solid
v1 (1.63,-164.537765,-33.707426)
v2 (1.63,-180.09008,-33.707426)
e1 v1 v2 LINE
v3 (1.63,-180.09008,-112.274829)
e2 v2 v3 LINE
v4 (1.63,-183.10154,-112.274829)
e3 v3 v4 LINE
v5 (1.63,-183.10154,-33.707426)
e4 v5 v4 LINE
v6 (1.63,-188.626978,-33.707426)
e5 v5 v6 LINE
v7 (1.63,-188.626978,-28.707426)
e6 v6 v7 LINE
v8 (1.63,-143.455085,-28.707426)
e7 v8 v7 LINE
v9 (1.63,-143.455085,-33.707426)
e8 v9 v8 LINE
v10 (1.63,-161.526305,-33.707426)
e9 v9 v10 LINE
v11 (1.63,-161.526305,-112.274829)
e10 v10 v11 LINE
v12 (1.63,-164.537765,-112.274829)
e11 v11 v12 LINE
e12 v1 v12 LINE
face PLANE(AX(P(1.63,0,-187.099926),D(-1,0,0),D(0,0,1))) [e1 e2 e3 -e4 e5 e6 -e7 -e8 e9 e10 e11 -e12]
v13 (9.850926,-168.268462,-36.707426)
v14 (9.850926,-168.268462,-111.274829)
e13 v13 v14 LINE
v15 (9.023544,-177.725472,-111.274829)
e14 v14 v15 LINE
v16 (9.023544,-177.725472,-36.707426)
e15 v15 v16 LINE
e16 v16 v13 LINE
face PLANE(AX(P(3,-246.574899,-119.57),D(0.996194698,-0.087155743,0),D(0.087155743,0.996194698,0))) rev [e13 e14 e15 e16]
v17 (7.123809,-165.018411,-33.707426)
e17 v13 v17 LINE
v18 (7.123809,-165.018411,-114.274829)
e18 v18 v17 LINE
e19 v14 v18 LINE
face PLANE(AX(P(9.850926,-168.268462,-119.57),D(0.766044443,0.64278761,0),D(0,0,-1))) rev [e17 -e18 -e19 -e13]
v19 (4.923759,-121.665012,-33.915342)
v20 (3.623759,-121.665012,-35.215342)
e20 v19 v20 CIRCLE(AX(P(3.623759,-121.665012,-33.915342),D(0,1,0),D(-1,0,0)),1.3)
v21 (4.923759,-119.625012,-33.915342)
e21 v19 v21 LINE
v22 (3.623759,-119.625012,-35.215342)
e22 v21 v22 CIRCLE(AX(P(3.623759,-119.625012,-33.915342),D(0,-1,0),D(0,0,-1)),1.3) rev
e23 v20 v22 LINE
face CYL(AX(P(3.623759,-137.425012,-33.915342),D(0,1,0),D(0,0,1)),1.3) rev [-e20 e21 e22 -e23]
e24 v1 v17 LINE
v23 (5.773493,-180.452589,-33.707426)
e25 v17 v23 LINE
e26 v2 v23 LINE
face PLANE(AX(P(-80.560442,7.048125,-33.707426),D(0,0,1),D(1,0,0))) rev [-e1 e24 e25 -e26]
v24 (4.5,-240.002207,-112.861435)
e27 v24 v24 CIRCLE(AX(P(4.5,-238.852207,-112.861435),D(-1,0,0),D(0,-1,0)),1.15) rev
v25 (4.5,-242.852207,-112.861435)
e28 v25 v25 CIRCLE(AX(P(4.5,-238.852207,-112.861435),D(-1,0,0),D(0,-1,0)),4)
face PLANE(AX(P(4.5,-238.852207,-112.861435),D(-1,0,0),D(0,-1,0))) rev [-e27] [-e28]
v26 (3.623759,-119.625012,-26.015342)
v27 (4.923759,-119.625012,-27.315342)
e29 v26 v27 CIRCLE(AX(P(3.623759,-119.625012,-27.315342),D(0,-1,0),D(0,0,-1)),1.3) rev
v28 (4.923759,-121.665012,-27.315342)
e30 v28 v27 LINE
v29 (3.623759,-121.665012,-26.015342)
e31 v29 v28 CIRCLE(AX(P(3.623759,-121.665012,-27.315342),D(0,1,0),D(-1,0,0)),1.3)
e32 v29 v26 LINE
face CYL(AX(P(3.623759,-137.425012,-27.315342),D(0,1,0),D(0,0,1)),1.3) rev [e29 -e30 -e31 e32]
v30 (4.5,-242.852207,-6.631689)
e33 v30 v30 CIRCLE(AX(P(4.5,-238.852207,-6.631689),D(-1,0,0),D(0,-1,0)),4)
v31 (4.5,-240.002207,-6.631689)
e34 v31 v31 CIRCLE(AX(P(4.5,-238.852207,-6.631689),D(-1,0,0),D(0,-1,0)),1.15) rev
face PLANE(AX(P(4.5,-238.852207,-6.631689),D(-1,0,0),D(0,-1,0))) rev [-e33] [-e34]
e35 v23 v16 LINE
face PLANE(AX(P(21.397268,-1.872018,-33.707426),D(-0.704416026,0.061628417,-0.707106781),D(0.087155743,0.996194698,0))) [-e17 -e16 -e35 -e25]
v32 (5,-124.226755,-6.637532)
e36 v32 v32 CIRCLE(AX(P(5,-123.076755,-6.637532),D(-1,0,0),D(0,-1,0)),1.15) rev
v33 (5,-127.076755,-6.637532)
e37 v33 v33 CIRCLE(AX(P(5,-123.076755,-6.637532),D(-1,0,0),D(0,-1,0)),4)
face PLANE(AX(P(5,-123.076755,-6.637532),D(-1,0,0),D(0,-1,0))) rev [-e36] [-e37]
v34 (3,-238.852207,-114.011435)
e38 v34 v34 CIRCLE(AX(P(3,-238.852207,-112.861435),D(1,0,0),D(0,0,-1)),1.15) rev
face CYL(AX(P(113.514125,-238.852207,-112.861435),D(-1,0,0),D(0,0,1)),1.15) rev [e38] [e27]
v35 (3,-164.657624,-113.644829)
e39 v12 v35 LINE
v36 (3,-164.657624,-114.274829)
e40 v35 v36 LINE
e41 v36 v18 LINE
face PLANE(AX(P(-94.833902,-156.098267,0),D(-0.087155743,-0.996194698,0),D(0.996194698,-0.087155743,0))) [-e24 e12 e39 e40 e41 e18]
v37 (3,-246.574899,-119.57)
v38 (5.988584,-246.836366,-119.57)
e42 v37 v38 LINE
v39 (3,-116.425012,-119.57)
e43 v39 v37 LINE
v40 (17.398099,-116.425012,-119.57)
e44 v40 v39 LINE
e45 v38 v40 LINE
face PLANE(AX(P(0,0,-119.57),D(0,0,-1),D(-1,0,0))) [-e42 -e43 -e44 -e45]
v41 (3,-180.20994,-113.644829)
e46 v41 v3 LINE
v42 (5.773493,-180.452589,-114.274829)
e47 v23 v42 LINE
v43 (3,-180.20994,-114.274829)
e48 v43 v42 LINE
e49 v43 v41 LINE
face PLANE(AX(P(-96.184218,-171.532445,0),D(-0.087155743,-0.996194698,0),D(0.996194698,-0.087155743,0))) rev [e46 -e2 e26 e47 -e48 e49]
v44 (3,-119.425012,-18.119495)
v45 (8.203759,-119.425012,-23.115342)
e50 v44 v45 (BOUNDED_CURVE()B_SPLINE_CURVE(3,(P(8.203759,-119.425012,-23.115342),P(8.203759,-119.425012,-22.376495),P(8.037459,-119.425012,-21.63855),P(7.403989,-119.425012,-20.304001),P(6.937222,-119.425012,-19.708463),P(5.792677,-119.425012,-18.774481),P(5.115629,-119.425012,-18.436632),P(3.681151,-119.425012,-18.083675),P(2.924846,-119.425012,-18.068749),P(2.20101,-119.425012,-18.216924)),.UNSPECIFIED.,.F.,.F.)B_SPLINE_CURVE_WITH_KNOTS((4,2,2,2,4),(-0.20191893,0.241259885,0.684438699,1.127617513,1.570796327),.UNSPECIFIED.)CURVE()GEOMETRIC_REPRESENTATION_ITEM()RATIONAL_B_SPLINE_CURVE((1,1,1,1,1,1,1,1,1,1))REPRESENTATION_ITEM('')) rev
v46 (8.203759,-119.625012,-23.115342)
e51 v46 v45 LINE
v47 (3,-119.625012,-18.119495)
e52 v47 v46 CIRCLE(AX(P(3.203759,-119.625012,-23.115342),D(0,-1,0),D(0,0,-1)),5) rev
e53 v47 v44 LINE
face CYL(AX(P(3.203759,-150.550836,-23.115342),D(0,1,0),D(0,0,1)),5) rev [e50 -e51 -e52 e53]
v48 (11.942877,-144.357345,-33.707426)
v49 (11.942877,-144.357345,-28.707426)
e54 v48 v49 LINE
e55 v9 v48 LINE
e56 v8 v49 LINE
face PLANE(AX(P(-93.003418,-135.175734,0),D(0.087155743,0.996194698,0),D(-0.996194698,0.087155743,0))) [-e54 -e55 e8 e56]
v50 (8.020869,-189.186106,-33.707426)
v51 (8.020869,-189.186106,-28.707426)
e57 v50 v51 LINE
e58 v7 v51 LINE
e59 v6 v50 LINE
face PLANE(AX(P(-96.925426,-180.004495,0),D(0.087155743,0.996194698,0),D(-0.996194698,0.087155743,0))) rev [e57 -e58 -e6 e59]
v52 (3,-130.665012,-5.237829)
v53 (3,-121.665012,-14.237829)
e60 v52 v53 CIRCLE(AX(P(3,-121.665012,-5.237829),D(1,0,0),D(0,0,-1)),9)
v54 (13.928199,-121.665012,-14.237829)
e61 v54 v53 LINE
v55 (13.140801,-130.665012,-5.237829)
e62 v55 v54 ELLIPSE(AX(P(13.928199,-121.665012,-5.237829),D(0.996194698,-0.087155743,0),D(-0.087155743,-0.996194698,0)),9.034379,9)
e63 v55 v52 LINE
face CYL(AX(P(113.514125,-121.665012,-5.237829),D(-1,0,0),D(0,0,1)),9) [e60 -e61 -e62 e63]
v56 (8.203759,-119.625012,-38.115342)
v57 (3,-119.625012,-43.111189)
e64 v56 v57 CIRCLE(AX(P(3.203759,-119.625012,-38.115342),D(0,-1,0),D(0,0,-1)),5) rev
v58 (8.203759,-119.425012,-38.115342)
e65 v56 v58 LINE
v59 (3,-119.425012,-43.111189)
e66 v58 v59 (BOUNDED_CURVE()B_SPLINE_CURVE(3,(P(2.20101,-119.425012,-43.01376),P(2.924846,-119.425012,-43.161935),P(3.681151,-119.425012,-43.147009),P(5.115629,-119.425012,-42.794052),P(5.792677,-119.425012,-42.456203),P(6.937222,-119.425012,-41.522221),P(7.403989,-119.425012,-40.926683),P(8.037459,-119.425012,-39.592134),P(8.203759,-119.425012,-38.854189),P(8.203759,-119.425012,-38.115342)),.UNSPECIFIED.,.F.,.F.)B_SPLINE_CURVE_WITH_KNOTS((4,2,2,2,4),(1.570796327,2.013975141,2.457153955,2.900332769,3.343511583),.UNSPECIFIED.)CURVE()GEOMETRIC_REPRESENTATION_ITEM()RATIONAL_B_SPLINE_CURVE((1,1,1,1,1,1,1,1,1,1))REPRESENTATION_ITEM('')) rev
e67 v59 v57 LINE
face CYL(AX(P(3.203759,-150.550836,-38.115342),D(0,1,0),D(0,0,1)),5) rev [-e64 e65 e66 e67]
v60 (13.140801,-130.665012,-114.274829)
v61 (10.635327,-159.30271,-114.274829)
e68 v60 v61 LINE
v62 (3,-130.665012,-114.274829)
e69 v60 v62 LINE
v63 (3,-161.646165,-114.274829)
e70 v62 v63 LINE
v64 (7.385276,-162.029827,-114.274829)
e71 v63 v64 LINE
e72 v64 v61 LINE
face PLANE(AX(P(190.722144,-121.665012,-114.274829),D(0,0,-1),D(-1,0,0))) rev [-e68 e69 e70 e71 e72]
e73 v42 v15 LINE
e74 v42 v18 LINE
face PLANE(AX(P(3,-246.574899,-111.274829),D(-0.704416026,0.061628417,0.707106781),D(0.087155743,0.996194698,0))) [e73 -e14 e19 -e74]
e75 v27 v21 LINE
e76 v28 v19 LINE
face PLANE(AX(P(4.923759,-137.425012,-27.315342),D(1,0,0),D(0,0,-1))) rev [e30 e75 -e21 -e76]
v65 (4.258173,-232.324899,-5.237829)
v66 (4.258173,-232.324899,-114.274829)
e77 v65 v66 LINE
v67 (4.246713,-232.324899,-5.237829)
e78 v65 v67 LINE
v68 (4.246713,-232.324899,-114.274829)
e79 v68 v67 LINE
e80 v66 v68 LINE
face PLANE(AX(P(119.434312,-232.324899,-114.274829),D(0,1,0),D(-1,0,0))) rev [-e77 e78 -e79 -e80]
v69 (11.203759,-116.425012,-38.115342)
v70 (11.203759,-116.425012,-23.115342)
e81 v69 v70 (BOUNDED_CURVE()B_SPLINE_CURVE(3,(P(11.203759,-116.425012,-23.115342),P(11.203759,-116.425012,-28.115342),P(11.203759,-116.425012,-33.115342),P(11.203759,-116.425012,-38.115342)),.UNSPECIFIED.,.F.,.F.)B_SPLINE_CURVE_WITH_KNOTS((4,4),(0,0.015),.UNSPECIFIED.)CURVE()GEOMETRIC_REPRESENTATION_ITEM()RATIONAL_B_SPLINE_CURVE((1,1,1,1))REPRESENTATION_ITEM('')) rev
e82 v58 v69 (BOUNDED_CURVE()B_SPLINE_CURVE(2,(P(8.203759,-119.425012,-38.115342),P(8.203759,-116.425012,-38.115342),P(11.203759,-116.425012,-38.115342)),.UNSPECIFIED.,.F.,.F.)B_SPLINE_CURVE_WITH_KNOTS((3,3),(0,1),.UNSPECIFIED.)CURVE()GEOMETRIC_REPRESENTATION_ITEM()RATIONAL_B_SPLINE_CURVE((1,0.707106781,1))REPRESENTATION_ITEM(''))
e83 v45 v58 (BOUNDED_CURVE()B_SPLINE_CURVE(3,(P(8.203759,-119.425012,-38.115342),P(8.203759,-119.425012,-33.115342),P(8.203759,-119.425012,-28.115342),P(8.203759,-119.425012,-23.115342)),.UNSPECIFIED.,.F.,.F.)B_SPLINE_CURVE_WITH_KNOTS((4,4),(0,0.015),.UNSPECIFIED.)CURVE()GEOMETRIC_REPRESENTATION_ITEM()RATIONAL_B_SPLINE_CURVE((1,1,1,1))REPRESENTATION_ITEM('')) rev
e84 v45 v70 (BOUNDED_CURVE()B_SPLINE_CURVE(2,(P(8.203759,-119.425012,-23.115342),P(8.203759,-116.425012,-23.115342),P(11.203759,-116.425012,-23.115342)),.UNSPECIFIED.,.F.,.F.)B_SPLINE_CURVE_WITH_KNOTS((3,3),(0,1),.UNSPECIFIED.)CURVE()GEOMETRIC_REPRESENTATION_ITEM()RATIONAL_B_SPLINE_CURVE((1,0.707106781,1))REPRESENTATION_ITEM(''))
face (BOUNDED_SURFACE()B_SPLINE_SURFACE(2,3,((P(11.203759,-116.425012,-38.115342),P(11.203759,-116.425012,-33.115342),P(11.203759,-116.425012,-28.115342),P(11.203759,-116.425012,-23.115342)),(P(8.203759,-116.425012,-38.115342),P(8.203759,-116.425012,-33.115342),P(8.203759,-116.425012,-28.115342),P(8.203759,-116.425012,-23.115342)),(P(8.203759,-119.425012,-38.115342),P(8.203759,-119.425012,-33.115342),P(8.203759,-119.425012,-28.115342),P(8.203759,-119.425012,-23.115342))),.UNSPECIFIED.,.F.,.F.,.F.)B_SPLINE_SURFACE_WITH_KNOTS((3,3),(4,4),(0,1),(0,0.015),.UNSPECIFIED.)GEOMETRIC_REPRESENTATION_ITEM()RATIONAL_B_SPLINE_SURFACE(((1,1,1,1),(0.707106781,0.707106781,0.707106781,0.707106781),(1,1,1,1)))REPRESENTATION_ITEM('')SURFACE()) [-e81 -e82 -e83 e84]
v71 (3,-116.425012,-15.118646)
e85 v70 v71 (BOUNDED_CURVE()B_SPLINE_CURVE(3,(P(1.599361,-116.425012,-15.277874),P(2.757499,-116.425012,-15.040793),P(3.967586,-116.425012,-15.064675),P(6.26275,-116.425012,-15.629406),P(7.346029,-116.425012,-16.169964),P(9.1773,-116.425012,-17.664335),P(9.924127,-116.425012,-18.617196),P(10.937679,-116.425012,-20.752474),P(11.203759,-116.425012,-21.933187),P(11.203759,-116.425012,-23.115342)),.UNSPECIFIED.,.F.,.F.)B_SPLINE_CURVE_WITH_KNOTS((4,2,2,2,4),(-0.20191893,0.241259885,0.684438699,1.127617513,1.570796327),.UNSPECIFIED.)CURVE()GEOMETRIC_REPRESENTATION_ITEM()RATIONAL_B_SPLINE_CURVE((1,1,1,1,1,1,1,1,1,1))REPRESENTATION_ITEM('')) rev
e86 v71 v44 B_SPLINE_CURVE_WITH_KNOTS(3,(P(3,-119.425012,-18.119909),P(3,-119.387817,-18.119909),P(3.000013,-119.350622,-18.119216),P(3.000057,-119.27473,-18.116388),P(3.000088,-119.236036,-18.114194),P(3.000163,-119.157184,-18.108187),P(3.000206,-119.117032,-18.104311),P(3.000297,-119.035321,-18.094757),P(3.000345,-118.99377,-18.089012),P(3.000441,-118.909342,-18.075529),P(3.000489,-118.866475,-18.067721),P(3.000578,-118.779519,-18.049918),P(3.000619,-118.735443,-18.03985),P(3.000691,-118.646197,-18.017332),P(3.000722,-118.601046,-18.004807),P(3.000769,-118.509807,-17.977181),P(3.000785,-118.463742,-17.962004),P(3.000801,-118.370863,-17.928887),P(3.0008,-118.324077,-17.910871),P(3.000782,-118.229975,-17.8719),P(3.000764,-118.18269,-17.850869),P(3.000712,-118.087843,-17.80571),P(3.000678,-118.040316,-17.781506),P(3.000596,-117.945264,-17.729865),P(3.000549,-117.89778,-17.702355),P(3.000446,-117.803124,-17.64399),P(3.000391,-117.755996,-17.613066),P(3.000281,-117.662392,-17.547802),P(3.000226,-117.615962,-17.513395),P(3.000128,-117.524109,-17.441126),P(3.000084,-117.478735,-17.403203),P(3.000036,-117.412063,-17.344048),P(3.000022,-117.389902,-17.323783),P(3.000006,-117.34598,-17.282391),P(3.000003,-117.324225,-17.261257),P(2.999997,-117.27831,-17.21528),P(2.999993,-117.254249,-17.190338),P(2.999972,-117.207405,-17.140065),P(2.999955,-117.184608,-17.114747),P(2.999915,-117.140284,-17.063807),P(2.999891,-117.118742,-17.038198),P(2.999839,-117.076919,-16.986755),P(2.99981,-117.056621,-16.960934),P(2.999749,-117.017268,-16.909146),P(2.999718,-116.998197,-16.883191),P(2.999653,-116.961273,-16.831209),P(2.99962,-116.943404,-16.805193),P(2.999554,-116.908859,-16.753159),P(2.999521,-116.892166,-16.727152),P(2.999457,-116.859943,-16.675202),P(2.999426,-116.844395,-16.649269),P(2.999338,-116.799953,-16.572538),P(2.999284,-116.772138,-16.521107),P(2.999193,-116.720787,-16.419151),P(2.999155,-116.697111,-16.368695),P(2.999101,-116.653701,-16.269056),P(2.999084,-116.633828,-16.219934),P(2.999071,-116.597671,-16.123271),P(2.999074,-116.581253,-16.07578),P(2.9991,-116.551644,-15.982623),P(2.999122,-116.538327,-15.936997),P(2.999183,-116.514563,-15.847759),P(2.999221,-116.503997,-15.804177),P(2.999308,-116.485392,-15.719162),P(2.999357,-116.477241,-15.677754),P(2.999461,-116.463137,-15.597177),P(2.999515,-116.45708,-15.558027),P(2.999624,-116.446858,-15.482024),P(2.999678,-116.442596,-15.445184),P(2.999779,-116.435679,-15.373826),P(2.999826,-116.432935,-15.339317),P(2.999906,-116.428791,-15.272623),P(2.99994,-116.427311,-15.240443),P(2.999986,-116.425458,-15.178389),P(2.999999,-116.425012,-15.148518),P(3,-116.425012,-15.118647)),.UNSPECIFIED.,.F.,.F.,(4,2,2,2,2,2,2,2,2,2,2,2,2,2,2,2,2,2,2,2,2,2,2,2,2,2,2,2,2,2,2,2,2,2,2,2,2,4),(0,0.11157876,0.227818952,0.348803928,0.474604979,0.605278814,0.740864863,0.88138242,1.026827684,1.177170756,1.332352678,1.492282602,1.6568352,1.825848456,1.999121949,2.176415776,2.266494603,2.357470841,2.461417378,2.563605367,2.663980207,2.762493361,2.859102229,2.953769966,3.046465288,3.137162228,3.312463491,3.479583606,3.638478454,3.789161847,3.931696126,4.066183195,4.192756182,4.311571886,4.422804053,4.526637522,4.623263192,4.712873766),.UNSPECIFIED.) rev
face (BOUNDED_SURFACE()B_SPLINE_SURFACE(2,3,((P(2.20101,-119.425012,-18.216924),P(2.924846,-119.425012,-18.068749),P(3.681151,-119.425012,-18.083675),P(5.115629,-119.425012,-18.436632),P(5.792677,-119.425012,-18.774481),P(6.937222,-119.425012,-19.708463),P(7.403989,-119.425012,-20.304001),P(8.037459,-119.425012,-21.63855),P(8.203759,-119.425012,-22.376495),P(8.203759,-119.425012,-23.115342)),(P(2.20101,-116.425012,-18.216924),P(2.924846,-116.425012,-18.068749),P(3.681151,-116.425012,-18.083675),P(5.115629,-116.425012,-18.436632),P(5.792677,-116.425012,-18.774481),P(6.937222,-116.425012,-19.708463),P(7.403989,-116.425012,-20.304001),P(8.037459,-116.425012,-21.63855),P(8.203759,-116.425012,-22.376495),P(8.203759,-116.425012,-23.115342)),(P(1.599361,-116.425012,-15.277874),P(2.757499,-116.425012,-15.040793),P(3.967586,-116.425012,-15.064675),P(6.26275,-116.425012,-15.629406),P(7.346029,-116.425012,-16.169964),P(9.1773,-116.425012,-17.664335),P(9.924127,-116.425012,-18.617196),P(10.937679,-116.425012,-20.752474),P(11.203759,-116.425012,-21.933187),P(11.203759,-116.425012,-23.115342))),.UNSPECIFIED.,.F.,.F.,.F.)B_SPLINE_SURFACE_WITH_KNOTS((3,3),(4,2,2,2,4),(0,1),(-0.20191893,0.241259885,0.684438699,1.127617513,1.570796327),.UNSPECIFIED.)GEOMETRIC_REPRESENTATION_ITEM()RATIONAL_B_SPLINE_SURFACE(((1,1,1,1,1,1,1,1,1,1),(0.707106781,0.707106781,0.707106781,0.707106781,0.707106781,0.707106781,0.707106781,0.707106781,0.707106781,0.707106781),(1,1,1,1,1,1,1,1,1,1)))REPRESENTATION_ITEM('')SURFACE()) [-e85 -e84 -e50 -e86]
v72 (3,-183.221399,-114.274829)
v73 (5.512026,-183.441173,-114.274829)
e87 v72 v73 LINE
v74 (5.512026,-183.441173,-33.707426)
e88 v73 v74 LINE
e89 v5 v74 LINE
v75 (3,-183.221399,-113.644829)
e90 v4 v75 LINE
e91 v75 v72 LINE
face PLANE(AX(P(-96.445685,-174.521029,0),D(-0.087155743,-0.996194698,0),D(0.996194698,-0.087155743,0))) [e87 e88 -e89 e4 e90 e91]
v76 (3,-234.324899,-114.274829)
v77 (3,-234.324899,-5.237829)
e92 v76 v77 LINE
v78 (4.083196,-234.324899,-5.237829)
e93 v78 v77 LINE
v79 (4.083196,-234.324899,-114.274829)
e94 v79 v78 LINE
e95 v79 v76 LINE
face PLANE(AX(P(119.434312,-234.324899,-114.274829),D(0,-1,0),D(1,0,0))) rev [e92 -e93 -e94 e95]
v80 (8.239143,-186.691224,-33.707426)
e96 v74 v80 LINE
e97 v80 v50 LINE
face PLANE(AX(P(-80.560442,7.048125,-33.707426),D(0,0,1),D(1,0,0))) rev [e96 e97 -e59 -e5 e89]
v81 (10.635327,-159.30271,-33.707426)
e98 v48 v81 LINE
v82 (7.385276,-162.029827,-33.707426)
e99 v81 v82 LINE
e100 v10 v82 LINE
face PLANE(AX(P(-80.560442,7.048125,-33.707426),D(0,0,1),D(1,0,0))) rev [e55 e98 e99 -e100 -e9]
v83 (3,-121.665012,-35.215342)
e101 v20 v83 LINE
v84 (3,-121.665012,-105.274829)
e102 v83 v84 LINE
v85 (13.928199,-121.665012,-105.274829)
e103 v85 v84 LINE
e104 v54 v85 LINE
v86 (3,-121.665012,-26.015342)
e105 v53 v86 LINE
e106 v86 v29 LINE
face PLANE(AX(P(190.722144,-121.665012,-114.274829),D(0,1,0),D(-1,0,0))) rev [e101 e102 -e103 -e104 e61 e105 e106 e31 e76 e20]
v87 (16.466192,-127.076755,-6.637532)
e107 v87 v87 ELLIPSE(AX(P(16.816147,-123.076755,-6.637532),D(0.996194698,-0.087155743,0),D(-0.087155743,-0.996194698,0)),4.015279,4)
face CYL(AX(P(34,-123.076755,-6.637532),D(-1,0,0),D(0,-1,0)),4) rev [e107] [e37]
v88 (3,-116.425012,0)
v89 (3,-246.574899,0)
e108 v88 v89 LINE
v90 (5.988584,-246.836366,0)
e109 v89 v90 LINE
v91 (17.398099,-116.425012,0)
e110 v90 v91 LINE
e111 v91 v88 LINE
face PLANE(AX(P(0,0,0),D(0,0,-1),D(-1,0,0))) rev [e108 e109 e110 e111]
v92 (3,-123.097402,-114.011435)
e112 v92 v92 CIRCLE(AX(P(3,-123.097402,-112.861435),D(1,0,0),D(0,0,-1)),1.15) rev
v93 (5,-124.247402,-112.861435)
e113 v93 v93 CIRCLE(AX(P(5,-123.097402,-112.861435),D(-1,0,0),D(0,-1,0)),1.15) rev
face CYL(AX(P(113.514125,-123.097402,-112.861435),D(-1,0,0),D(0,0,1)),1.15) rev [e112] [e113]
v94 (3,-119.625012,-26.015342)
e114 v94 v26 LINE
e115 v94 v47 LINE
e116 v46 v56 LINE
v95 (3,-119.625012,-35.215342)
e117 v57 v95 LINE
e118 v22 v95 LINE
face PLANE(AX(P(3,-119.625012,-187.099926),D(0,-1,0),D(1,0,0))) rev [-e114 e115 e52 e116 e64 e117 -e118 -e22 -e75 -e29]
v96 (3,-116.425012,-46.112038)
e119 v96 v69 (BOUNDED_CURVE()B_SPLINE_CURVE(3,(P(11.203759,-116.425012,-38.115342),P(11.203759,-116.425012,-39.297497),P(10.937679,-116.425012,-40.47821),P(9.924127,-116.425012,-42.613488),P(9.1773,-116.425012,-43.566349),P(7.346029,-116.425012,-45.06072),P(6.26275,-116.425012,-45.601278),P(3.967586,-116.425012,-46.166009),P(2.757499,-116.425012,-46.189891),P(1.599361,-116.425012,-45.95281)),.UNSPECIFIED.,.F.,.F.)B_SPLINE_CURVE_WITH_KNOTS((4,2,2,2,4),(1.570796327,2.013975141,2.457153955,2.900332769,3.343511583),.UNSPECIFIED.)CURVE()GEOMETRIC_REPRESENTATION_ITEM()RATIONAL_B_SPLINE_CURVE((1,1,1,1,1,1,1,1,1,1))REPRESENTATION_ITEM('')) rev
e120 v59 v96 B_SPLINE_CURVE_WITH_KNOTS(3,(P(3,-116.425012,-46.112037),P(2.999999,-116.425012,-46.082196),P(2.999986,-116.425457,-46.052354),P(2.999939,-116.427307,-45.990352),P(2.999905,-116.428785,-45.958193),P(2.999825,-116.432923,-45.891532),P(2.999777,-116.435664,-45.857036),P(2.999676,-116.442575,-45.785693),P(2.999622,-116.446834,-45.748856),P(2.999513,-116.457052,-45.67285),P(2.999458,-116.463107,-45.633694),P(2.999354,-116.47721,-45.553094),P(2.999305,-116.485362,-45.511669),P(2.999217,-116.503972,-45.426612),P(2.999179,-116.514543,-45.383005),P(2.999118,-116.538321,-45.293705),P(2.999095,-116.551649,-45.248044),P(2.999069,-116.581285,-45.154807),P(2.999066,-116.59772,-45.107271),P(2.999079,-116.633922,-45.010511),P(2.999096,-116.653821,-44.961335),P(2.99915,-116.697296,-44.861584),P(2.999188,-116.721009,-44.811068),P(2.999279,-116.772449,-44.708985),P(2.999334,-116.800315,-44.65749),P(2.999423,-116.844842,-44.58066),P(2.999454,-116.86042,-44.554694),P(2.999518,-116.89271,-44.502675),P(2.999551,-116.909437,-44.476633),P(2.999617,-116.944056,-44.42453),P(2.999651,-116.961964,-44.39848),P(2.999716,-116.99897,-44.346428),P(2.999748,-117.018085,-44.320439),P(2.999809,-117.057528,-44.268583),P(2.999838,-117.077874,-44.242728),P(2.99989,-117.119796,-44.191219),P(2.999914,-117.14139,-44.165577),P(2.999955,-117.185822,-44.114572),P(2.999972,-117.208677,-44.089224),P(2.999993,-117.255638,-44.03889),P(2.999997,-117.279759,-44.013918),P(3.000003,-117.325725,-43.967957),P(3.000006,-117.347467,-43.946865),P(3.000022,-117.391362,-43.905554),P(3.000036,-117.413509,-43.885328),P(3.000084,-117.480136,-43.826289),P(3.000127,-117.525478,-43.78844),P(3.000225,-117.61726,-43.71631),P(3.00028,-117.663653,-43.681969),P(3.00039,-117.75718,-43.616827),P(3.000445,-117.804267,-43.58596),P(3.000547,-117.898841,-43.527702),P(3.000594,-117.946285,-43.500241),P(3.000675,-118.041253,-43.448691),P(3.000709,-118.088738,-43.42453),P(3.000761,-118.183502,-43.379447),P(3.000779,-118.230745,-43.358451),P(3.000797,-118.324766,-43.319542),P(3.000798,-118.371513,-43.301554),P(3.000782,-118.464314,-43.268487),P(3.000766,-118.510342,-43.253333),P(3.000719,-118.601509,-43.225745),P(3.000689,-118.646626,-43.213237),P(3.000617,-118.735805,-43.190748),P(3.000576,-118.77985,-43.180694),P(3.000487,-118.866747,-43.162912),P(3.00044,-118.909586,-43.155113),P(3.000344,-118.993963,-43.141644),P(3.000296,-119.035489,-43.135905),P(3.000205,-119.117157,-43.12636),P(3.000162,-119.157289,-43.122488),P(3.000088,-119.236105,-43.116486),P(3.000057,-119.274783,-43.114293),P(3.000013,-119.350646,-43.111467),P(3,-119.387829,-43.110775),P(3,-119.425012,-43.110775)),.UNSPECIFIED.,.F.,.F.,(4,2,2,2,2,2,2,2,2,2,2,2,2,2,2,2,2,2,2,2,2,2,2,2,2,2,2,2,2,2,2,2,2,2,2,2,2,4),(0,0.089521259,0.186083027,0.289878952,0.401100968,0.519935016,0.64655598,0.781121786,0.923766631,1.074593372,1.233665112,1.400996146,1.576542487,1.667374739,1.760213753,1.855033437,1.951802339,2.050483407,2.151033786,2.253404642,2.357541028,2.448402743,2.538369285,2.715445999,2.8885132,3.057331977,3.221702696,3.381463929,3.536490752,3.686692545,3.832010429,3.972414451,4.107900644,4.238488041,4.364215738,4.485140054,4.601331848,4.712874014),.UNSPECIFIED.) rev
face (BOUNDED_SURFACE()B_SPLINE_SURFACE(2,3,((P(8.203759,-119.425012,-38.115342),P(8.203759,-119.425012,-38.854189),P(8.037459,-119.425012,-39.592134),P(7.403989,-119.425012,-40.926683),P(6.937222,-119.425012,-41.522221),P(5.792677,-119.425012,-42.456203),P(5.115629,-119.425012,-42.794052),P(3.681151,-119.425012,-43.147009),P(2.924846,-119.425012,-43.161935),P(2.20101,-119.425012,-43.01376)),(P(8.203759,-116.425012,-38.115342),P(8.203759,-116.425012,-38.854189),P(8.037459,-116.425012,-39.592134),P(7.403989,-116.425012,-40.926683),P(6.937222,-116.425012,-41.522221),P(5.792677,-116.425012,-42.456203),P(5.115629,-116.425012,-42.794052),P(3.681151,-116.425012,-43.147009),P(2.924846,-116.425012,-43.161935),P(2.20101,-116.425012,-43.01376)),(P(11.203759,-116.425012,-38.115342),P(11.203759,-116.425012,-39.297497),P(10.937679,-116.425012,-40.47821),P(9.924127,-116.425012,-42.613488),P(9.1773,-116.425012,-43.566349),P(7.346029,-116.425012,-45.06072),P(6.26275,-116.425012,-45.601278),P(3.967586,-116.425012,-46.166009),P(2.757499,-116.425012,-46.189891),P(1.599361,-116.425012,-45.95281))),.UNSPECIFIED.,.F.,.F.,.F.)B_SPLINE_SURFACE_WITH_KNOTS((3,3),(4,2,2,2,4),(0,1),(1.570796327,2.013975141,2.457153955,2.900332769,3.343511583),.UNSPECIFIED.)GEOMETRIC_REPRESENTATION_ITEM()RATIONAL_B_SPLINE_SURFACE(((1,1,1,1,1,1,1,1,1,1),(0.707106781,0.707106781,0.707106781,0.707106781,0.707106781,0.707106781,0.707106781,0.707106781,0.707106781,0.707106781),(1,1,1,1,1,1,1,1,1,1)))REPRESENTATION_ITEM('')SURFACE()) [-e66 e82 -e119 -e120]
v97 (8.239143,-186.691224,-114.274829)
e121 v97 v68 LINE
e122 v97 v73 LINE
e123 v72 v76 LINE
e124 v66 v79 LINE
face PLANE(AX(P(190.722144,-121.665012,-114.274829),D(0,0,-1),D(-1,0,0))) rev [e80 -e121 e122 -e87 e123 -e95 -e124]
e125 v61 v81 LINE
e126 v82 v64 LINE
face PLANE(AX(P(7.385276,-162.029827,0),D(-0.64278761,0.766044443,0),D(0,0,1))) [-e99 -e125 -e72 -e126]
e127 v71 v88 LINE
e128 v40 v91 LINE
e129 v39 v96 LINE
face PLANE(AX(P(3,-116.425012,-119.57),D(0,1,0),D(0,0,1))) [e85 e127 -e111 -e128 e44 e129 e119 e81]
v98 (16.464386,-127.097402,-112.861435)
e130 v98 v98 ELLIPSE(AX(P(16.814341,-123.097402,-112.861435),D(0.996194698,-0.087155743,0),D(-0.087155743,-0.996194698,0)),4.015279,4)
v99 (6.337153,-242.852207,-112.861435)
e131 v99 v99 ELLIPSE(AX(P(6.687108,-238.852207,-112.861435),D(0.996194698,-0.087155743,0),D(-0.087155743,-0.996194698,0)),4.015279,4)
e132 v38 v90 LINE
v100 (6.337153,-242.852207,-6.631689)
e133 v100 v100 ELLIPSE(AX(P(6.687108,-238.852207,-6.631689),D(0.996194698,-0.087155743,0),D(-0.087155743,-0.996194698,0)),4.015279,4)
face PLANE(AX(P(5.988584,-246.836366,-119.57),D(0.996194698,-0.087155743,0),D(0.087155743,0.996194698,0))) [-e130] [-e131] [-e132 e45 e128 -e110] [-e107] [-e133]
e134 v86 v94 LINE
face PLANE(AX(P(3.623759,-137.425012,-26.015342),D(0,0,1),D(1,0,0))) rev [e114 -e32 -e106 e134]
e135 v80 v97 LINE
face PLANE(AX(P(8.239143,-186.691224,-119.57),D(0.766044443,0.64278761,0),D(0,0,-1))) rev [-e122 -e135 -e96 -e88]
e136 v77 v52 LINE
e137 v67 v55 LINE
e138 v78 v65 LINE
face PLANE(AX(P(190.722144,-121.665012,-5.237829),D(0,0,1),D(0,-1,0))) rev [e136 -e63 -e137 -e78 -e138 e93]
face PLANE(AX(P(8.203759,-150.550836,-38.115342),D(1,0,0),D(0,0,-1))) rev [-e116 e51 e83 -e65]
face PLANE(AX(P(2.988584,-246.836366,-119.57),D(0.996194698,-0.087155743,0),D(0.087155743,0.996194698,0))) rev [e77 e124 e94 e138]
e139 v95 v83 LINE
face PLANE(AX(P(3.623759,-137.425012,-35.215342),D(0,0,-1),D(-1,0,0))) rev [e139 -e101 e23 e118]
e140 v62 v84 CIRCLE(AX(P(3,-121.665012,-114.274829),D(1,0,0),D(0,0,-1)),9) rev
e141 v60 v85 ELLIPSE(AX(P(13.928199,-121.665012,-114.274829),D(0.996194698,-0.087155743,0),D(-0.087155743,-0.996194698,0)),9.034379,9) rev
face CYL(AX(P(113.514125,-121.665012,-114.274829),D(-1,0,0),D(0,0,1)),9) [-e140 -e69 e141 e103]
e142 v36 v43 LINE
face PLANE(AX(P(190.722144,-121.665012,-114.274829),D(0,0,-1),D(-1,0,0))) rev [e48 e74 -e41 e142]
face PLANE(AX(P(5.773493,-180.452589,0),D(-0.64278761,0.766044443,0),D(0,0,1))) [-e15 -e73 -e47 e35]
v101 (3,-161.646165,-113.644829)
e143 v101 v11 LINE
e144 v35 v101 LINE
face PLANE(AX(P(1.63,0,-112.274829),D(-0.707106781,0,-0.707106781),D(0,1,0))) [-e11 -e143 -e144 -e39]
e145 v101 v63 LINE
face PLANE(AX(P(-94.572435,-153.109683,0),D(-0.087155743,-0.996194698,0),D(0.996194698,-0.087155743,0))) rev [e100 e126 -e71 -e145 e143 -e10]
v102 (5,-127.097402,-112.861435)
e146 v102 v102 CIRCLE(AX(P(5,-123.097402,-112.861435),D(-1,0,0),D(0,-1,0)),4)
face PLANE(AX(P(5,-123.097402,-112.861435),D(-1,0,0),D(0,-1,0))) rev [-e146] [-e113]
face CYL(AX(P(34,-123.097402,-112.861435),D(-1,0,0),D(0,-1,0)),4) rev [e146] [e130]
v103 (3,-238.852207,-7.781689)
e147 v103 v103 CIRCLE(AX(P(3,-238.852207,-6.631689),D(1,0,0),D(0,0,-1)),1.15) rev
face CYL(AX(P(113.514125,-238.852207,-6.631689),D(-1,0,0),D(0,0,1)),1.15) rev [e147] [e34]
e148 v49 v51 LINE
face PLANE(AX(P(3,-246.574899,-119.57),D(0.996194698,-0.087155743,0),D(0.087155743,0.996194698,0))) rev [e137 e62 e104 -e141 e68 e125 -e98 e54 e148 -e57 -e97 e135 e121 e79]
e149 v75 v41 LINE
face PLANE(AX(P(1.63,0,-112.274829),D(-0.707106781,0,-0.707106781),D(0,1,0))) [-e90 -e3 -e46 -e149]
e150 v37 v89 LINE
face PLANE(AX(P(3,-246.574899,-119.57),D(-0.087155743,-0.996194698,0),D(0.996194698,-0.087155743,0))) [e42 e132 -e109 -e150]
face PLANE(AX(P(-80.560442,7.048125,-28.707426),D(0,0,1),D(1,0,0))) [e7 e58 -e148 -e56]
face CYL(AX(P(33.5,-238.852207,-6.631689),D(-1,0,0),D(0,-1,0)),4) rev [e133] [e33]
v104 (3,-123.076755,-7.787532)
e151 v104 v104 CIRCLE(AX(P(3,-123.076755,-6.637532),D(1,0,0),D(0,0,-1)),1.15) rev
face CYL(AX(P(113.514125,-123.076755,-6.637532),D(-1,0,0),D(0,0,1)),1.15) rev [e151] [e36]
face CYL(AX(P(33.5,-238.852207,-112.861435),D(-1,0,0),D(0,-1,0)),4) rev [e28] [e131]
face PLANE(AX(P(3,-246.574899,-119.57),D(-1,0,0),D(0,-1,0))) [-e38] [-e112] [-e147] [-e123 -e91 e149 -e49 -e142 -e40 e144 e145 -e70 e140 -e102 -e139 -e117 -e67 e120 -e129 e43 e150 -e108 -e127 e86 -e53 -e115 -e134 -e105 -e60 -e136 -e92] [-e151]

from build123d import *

# Parameters (mm, degrees)
BOSS_EXTRUDE1_DEPTH       = 119.57
CUT_EXTRUDE1_START        = -114.274828565
CUT_EXTRUDE1_DEPTH        = 109.036999581
BOSS_EXTRUDE2_OUTLINE_R   = 1.15
BOSS_EXTRUDE2_DEPTH       = 12
BOSS_EXTRUDE2_2_OUTLINE_W = 8
BOSS_EXTRUDE2_2_OUTLINE_H = 109.036999581
BOSS_EXTRUDE2_2_OUTLINE_R = 1.15
BOSS_EXTRUDE2_2_DEPTH     = 1.246713455
BOSS_EXTRUDE4_START       = -114.274828565
BOSS_EXTRUDE4_DEPTH       = 85.567402499
BOSS_EXTRUDE4_START_2     = -33.707426066
BOSS_EXTRUDE4_2_DEPTH     = 5
CHAMFER6_SIZE             = 2
CHAMFER7_SIZE             = 3
CHAMFER8_SIZE             = 3
SKETCH10_R                = 1.15
CUT_EXTRUDE2_DEPTH        = 40
CUT_EXTRUDE5_START        = -2
SKETCH11_R                = 4
CUT_EXTRUDE5_DEPTH        = 29
CUT_EXTRUDE6_START        = -1.5
SKETCH14_R                = 4
CUT_EXTRUDE6_DEPTH        = 29
CUT_EXTRUDE8_DEPTH        = 21
CUT_EXTRUDE9_DEPTH        = 3.2
FILLET2_SIZE              = 3
CUT_EXTRUDE11_REACH       = 276.65
SKETCH17_W                = 2
SKETCH17_H                = 109.036999581


with BuildPart() as part:
    # Sketch1 → Boss-Extrude1 (new body)
    with BuildSketch(Plane.XY):
        Polygon((3, -246.574899039), (5.988584094, -246.836366267), (17.398099188, -116.425012), (3, -116.425012), align=None)
    extrude(amount=-BOSS_EXTRUDE1_DEPTH)

    # Cut-Extrude1: read off the stored shape, not the designer's step
    # Cut-Extrude1 outline → Cut-Extrude1 (cut)
    with BuildSketch(Plane.XY.offset(CUT_EXTRUDE1_START)):
        Polygon((3, -240.324899039), (3.546804147, -240.324899039), (13.928199078, -121.665012), (3, -121.665012), align=None)
    extrude(amount=CUT_EXTRUDE1_DEPTH, mode=Mode.SUBTRACT)

    # Boss-Extrude2: read off the stored shape, not the designer's step
    # Boss-Extrude2 outline → Boss-Extrude2 (add)
    # profile 1 of 2: a face of its own
    with BuildSketch(Plane.YZ.offset(3)):
        with BuildLine():
            ThreePointArc((-121.665012, -105.274828565), (-128.028973031, -107.910867534), (-130.665012, -114.274828565))
            Line((-130.665012, -114.274828565), (-121.665012, -114.274828565))
            Line((-121.665012, -114.274828565), (-121.665012, -105.274828565))
        make_face()
        with Locations((-123.097401734, -112.861435085)):
            Circle(BOSS_EXTRUDE2_OUTLINE_R, mode=Mode.SUBTRACT)
    # profile 2 of 2: a face of its own
    with BuildSketch(Plane.YZ.offset(3)):
        with BuildLine():
            ThreePointArc((-130.665012, -5.237828984), (-128.02897303, -11.601790014), (-121.665012, -14.237828984))
            Line((-121.665012, -14.237828984), (-121.665012, -5.237828984))
            Line((-121.665012, -5.237828984), (-130.665012, -5.237828984))
        make_face()
        with Locations((-123.076755271, -6.637532276)):
            Circle(BOSS_EXTRUDE2_OUTLINE_R, mode=Mode.SUBTRACT)
    extrude(amount=BOSS_EXTRUDE2_DEPTH)

    # Boss-Extrude2 2 outline → Boss-Extrude2 2 (add)
    with BuildSketch(Plane.YZ.offset(3)):
        with Locations((-236.324899039, -59.756328775)):
            Rectangle(BOSS_EXTRUDE2_2_OUTLINE_W, BOSS_EXTRUDE2_2_OUTLINE_H)
        with Locations((-238.852206599, -112.861435085)):
            Circle(BOSS_EXTRUDE2_2_OUTLINE_R, mode=Mode.SUBTRACT)
        with Locations((-238.852206599, -6.631689226)):
            Circle(BOSS_EXTRUDE2_2_OUTLINE_R, mode=Mode.SUBTRACT)
    extrude(amount=BOSS_EXTRUDE2_2_DEPTH)

    # Boss-Extrude4: read off the stored shape, not the designer's step
    # Boss-Extrude4 outline → Boss-Extrude4 (add)
    with BuildSketch(Plane.XY.offset(BOSS_EXTRUDE4_START)):
        Polygon((10.373859962, -162.291294), (1.63, -161.526305378), (1.63, -164.53776489), (10.112392734, -165.279878094), align=None)
        Polygon((8.762077136, -180.714056005), (1.63, -180.090080109), (1.63, -183.101539621), (8.500609907, -183.7026401), align=None)
    extrude(amount=BOSS_EXTRUDE4_DEPTH)

    # Boss-Extrude4 2 outline → Boss-Extrude4 2 (add)
    with BuildSketch(Plane.XY.offset(BOSS_EXTRUDE4_START_2)):
        Polygon((11.942877213, -144.35734476), (1.63, -143.455084916), (1.63, -161.526305378), (10.373859962, -162.291294), align=None)
        Polygon((10.112392734, -165.279878094), (1.63, -164.53776489), (1.63, -180.090080109), (8.762077136, -180.714056005), align=None)
        Polygon((8.500609907, -183.7026401), (1.63, -183.101539621), (1.63, -188.626977605), (8.020868789, -189.186106174), align=None)
    extrude(amount=BOSS_EXTRUDE4_2_DEPTH)

    # Chamfer6
    # the kernel refuses this chamfer: 2 mm, written as the material it takes off along each edge
    with BuildSketch(Plane(origin=(1.63, -174.946714133, -114.274828565), x_dir=(0, 0, 1), z_dir=(0, -1, 0))) as chamfer6_piece_1_section:
        Polygon((CHAMFER6_SIZE, 0), (0, -CHAMFER6_SIZE), (0, 0), align=None)
    chamfer6_piece_1 = extrude(amount=13.298191464, mode=Mode.PRIVATE)
    chamfer6_piece_1 = split(chamfer6_piece_1, bisect_by=Plane(origin=(3, -174.946714133, -114.274828565), z_dir=(-1, 0, 0)), keep=Keep.TOP, mode=Mode.PRIVATE)
    add(chamfer6_piece_1, mode=Mode.SUBTRACT)
    with BuildSketch(Plane(origin=(1.63, -156.382939402, -114.274828565), x_dir=(0, 0, 1), z_dir=(0, -1, 0))) as chamfer6_piece_2_section:
        Polygon((CHAMFER6_SIZE, 0), (0, -CHAMFER6_SIZE), (0, 0), align=None)
    chamfer6_piece_2 = extrude(amount=13.298191464, mode=Mode.PRIVATE)
    chamfer6_piece_2 = split(chamfer6_piece_2, bisect_by=Plane(origin=(3, -156.382939402, -114.274828565), z_dir=(-1, 0, 0)), keep=Keep.TOP, mode=Mode.PRIVATE)
    add(chamfer6_piece_2, mode=Mode.SUBTRACT)

    # Chamfer7
    chamfer7_edges = [part.edges().sort_by_distance(p)[0] for p in [
        (10.112392734, -165.279878094, -73.991127315),
        (8.762077136, -180.714056005, -73.991127315),
        (9.437234935, -172.99696705, -33.707426066),
        (9.437234935, -172.996967049, -114.274828565),
    ]]
    chamfer(chamfer7_edges, length=CHAMFER7_SIZE)

    # Chamfer8
    chamfer8_edges = [part.edges().sort_by_distance(p)[0] for p in [
        (8.500609907, -183.7026401, -73.991127315),
        (10.373859962, -162.291294, -73.991127315),
    ]]
    chamfer(chamfer8_edges, length=CHAMFER8_SIZE)

    # Sketch10 → Cut-Extrude2 (cut)
    with BuildSketch(Plane(origin=(3, 0, 0), x_dir=(0, -1, 0), z_dir=(-1, 0, 0))):
        with Locations((123.097401734, -112.861435085)):
            Circle(SKETCH10_R)
        with Locations((123.076755271, -6.637532276)):
            Circle(SKETCH10_R)
        with Locations((238.852206599, -6.631689226)):
            Circle(SKETCH10_R)
        with Locations((238.852206599, -112.861435085)):
            Circle(SKETCH10_R)
    extrude(amount=-CUT_EXTRUDE2_DEPTH, mode=Mode.SUBTRACT)

    # Sketch11 → Cut-Extrude5 (cut)
    with BuildSketch(Plane(origin=(3, 0, 0), x_dir=(0, -1, 0), z_dir=(-1, 0, 0)).offset(CUT_EXTRUDE5_START)):
        with Locations((123.097401734, -112.861435085)):
            Circle(SKETCH11_R)
        with Locations((123.076755271, -6.637532276)):
            Circle(SKETCH11_R)
    extrude(amount=-CUT_EXTRUDE5_DEPTH, mode=Mode.SUBTRACT)

    # Sketch14 → Cut-Extrude6 (cut)
    with BuildSketch(Plane(origin=(3, 0, 0), x_dir=(0, -1, 0), z_dir=(-1, 0, 0)).offset(CUT_EXTRUDE6_START)):
        with Locations((238.852206599, -6.631689226)):
            Circle(SKETCH14_R)
        with Locations((238.852206599, -112.861435085)):
            Circle(SKETCH14_R)
    extrude(amount=-CUT_EXTRUDE6_DEPTH, mode=Mode.SUBTRACT)

    # Sketch15 → Cut-Extrude8 (cut)
    with BuildSketch(Plane(origin=(0, -116.425012, 0), x_dir=(-1, 0, 0), z_dir=(0, 1, 0))):
        with BuildLine():
            Line((-3.623758546, -26.015341992), (-2.783758546, -26.015341992))
            ThreePointArc((-2.783758546, -26.015341992), (-1.864519731, -26.396103177), (-1.483758546, -27.315341992))
            Line((-1.483758546, -27.315341992), (-1.483758546, -33.915341992))
            ThreePointArc((-1.483758546, -33.915341992), (-1.864519731, -34.834580808), (-2.783758546, -35.215341992))
            Line((-2.783758546, -35.215341992), (-3.623758546, -35.215341992))
            ThreePointArc((-3.623758546, -35.215341992), (-4.542997362, -34.834580808), (-4.923758546, -33.915341992))
            Line((-4.923758546, -33.915341992), (-4.923758546, -27.315341992))
            ThreePointArc((-4.923758546, -27.315341992), (-4.542997362, -26.396103177), (-3.623758546, -26.015341992))
        make_face()
    extrude(amount=-CUT_EXTRUDE8_DEPTH, mode=Mode.SUBTRACT)

    # Sketch16 → Cut-Extrude9 (cut)
    with BuildSketch(Plane(origin=(0, -116.425012, 0), x_dir=(-1, 0, 0), z_dir=(0, 1, 0))):
        with BuildLine():
            Line((-8.203758546, -38.115341992), (-8.203758546, -23.115341992))
            ThreePointArc((-8.203758546, -23.115341992), (-3.203758546, -18.115341992), (1.796241454, -23.115341992))
            Line((1.796241454, -23.115341992), (1.796241454, -38.115341992))
            ThreePointArc((1.796241454, -38.115341992), (-3.203758546, -43.115341992), (-8.203758546, -38.115341992))
        make_face()
    extrude(amount=-CUT_EXTRUDE9_DEPTH, mode=Mode.SUBTRACT)

    # Fillet2
    # a fillet whose section is not a circle: 3 mm, written as the material it takes off along each edge
    with BuildSketch(Plane(origin=(3.203758546, -116.425012, -23.115341992), x_dir=(1, 0, 0), z_dir=(0, 0, -1))) as fillet2_piece_1:
        with BuildLine():
            Bezier((5 + FILLET2_SIZE, 0), (5, 0), (5, FILLET2_SIZE), weights=[1, 0.707106781, 1])
            Line((5, FILLET2_SIZE), (5, 0))
            Line((5, 0), (5 + FILLET2_SIZE, 0))
        make_face()
    revolve(axis=Axis((3.203758546, -116.425012, -23.115341992), (0, -1, 0)), revolution_arc=178.315556871, mode=Mode.SUBTRACT)
    with BuildSketch(Plane(origin=(8.203758546, -116.425012, -38.115341992), x_dir=(1, 0, 0), z_dir=(0, 0, 1))) as fillet2_piece_2:
        with BuildLine():
            Bezier((FILLET2_SIZE, 0), (0, 0), (0, -FILLET2_SIZE), weights=[1, 0.707106781, 1])
            Line((0, -FILLET2_SIZE), (0, 0))
            Line((0, 0), (FILLET2_SIZE, 0))
        make_face()
    extrude(amount=15, mode=Mode.SUBTRACT)
    with BuildSketch(Plane(origin=(3.203758546, -116.425012, -38.115341992), x_dir=(-0.9995678782122136, 0, -0.02939484387325848), z_dir=(-0.02939484387325848, 0, 0.9995678782122136))) as fillet2_piece_3:
        with BuildLine():
            Bezier((5 + FILLET2_SIZE, 0), (5, 0), (5, FILLET2_SIZE), weights=[1, 0.707106781, 1])
            Line((5, FILLET2_SIZE), (5, 0))
            Line((5, 0), (5 + FILLET2_SIZE, 0))
        make_face()
    revolve(axis=Axis((3.203758546, -116.425012, -38.115341992), (0, -1, 0)), revolution_arc=178.315556871, mode=Mode.SUBTRACT)

    # Cut-Extrude11: up to this plane
    cut_extrude11_end = Plane(origin=(2.988584094, -246.836366267, -119.57), z_dir=(0.9961946980917459, -0.08715574274765435, 0))
    # Sketch17 → Cut-Extrude11 (cut, up to the surface)
    with BuildSketch(Plane(origin=(3, 0, 0), x_dir=(0, -1, 0), z_dir=(-1, 0, 0)), mode=Mode.PRIVATE) as cut_extrude11_sk1:
        with Locations((233.324899039, -59.756328775)):
            Rectangle(SKETCH17_W, SKETCH17_H)
    cut_extrude11_tool1 = split(extrude(cut_extrude11_sk1.sketch, amount=-CUT_EXTRUDE11_REACH, mode=Mode.PRIVATE), bisect_by=cut_extrude11_end, keep=Keep.BOTH, mode=Mode.PRIVATE)
    add(cut_extrude11_tool1.solids().sort_by_distance((3, -233.324899, -59.756329))[0], mode=Mode.SUBTRACT)


solid = part.part
